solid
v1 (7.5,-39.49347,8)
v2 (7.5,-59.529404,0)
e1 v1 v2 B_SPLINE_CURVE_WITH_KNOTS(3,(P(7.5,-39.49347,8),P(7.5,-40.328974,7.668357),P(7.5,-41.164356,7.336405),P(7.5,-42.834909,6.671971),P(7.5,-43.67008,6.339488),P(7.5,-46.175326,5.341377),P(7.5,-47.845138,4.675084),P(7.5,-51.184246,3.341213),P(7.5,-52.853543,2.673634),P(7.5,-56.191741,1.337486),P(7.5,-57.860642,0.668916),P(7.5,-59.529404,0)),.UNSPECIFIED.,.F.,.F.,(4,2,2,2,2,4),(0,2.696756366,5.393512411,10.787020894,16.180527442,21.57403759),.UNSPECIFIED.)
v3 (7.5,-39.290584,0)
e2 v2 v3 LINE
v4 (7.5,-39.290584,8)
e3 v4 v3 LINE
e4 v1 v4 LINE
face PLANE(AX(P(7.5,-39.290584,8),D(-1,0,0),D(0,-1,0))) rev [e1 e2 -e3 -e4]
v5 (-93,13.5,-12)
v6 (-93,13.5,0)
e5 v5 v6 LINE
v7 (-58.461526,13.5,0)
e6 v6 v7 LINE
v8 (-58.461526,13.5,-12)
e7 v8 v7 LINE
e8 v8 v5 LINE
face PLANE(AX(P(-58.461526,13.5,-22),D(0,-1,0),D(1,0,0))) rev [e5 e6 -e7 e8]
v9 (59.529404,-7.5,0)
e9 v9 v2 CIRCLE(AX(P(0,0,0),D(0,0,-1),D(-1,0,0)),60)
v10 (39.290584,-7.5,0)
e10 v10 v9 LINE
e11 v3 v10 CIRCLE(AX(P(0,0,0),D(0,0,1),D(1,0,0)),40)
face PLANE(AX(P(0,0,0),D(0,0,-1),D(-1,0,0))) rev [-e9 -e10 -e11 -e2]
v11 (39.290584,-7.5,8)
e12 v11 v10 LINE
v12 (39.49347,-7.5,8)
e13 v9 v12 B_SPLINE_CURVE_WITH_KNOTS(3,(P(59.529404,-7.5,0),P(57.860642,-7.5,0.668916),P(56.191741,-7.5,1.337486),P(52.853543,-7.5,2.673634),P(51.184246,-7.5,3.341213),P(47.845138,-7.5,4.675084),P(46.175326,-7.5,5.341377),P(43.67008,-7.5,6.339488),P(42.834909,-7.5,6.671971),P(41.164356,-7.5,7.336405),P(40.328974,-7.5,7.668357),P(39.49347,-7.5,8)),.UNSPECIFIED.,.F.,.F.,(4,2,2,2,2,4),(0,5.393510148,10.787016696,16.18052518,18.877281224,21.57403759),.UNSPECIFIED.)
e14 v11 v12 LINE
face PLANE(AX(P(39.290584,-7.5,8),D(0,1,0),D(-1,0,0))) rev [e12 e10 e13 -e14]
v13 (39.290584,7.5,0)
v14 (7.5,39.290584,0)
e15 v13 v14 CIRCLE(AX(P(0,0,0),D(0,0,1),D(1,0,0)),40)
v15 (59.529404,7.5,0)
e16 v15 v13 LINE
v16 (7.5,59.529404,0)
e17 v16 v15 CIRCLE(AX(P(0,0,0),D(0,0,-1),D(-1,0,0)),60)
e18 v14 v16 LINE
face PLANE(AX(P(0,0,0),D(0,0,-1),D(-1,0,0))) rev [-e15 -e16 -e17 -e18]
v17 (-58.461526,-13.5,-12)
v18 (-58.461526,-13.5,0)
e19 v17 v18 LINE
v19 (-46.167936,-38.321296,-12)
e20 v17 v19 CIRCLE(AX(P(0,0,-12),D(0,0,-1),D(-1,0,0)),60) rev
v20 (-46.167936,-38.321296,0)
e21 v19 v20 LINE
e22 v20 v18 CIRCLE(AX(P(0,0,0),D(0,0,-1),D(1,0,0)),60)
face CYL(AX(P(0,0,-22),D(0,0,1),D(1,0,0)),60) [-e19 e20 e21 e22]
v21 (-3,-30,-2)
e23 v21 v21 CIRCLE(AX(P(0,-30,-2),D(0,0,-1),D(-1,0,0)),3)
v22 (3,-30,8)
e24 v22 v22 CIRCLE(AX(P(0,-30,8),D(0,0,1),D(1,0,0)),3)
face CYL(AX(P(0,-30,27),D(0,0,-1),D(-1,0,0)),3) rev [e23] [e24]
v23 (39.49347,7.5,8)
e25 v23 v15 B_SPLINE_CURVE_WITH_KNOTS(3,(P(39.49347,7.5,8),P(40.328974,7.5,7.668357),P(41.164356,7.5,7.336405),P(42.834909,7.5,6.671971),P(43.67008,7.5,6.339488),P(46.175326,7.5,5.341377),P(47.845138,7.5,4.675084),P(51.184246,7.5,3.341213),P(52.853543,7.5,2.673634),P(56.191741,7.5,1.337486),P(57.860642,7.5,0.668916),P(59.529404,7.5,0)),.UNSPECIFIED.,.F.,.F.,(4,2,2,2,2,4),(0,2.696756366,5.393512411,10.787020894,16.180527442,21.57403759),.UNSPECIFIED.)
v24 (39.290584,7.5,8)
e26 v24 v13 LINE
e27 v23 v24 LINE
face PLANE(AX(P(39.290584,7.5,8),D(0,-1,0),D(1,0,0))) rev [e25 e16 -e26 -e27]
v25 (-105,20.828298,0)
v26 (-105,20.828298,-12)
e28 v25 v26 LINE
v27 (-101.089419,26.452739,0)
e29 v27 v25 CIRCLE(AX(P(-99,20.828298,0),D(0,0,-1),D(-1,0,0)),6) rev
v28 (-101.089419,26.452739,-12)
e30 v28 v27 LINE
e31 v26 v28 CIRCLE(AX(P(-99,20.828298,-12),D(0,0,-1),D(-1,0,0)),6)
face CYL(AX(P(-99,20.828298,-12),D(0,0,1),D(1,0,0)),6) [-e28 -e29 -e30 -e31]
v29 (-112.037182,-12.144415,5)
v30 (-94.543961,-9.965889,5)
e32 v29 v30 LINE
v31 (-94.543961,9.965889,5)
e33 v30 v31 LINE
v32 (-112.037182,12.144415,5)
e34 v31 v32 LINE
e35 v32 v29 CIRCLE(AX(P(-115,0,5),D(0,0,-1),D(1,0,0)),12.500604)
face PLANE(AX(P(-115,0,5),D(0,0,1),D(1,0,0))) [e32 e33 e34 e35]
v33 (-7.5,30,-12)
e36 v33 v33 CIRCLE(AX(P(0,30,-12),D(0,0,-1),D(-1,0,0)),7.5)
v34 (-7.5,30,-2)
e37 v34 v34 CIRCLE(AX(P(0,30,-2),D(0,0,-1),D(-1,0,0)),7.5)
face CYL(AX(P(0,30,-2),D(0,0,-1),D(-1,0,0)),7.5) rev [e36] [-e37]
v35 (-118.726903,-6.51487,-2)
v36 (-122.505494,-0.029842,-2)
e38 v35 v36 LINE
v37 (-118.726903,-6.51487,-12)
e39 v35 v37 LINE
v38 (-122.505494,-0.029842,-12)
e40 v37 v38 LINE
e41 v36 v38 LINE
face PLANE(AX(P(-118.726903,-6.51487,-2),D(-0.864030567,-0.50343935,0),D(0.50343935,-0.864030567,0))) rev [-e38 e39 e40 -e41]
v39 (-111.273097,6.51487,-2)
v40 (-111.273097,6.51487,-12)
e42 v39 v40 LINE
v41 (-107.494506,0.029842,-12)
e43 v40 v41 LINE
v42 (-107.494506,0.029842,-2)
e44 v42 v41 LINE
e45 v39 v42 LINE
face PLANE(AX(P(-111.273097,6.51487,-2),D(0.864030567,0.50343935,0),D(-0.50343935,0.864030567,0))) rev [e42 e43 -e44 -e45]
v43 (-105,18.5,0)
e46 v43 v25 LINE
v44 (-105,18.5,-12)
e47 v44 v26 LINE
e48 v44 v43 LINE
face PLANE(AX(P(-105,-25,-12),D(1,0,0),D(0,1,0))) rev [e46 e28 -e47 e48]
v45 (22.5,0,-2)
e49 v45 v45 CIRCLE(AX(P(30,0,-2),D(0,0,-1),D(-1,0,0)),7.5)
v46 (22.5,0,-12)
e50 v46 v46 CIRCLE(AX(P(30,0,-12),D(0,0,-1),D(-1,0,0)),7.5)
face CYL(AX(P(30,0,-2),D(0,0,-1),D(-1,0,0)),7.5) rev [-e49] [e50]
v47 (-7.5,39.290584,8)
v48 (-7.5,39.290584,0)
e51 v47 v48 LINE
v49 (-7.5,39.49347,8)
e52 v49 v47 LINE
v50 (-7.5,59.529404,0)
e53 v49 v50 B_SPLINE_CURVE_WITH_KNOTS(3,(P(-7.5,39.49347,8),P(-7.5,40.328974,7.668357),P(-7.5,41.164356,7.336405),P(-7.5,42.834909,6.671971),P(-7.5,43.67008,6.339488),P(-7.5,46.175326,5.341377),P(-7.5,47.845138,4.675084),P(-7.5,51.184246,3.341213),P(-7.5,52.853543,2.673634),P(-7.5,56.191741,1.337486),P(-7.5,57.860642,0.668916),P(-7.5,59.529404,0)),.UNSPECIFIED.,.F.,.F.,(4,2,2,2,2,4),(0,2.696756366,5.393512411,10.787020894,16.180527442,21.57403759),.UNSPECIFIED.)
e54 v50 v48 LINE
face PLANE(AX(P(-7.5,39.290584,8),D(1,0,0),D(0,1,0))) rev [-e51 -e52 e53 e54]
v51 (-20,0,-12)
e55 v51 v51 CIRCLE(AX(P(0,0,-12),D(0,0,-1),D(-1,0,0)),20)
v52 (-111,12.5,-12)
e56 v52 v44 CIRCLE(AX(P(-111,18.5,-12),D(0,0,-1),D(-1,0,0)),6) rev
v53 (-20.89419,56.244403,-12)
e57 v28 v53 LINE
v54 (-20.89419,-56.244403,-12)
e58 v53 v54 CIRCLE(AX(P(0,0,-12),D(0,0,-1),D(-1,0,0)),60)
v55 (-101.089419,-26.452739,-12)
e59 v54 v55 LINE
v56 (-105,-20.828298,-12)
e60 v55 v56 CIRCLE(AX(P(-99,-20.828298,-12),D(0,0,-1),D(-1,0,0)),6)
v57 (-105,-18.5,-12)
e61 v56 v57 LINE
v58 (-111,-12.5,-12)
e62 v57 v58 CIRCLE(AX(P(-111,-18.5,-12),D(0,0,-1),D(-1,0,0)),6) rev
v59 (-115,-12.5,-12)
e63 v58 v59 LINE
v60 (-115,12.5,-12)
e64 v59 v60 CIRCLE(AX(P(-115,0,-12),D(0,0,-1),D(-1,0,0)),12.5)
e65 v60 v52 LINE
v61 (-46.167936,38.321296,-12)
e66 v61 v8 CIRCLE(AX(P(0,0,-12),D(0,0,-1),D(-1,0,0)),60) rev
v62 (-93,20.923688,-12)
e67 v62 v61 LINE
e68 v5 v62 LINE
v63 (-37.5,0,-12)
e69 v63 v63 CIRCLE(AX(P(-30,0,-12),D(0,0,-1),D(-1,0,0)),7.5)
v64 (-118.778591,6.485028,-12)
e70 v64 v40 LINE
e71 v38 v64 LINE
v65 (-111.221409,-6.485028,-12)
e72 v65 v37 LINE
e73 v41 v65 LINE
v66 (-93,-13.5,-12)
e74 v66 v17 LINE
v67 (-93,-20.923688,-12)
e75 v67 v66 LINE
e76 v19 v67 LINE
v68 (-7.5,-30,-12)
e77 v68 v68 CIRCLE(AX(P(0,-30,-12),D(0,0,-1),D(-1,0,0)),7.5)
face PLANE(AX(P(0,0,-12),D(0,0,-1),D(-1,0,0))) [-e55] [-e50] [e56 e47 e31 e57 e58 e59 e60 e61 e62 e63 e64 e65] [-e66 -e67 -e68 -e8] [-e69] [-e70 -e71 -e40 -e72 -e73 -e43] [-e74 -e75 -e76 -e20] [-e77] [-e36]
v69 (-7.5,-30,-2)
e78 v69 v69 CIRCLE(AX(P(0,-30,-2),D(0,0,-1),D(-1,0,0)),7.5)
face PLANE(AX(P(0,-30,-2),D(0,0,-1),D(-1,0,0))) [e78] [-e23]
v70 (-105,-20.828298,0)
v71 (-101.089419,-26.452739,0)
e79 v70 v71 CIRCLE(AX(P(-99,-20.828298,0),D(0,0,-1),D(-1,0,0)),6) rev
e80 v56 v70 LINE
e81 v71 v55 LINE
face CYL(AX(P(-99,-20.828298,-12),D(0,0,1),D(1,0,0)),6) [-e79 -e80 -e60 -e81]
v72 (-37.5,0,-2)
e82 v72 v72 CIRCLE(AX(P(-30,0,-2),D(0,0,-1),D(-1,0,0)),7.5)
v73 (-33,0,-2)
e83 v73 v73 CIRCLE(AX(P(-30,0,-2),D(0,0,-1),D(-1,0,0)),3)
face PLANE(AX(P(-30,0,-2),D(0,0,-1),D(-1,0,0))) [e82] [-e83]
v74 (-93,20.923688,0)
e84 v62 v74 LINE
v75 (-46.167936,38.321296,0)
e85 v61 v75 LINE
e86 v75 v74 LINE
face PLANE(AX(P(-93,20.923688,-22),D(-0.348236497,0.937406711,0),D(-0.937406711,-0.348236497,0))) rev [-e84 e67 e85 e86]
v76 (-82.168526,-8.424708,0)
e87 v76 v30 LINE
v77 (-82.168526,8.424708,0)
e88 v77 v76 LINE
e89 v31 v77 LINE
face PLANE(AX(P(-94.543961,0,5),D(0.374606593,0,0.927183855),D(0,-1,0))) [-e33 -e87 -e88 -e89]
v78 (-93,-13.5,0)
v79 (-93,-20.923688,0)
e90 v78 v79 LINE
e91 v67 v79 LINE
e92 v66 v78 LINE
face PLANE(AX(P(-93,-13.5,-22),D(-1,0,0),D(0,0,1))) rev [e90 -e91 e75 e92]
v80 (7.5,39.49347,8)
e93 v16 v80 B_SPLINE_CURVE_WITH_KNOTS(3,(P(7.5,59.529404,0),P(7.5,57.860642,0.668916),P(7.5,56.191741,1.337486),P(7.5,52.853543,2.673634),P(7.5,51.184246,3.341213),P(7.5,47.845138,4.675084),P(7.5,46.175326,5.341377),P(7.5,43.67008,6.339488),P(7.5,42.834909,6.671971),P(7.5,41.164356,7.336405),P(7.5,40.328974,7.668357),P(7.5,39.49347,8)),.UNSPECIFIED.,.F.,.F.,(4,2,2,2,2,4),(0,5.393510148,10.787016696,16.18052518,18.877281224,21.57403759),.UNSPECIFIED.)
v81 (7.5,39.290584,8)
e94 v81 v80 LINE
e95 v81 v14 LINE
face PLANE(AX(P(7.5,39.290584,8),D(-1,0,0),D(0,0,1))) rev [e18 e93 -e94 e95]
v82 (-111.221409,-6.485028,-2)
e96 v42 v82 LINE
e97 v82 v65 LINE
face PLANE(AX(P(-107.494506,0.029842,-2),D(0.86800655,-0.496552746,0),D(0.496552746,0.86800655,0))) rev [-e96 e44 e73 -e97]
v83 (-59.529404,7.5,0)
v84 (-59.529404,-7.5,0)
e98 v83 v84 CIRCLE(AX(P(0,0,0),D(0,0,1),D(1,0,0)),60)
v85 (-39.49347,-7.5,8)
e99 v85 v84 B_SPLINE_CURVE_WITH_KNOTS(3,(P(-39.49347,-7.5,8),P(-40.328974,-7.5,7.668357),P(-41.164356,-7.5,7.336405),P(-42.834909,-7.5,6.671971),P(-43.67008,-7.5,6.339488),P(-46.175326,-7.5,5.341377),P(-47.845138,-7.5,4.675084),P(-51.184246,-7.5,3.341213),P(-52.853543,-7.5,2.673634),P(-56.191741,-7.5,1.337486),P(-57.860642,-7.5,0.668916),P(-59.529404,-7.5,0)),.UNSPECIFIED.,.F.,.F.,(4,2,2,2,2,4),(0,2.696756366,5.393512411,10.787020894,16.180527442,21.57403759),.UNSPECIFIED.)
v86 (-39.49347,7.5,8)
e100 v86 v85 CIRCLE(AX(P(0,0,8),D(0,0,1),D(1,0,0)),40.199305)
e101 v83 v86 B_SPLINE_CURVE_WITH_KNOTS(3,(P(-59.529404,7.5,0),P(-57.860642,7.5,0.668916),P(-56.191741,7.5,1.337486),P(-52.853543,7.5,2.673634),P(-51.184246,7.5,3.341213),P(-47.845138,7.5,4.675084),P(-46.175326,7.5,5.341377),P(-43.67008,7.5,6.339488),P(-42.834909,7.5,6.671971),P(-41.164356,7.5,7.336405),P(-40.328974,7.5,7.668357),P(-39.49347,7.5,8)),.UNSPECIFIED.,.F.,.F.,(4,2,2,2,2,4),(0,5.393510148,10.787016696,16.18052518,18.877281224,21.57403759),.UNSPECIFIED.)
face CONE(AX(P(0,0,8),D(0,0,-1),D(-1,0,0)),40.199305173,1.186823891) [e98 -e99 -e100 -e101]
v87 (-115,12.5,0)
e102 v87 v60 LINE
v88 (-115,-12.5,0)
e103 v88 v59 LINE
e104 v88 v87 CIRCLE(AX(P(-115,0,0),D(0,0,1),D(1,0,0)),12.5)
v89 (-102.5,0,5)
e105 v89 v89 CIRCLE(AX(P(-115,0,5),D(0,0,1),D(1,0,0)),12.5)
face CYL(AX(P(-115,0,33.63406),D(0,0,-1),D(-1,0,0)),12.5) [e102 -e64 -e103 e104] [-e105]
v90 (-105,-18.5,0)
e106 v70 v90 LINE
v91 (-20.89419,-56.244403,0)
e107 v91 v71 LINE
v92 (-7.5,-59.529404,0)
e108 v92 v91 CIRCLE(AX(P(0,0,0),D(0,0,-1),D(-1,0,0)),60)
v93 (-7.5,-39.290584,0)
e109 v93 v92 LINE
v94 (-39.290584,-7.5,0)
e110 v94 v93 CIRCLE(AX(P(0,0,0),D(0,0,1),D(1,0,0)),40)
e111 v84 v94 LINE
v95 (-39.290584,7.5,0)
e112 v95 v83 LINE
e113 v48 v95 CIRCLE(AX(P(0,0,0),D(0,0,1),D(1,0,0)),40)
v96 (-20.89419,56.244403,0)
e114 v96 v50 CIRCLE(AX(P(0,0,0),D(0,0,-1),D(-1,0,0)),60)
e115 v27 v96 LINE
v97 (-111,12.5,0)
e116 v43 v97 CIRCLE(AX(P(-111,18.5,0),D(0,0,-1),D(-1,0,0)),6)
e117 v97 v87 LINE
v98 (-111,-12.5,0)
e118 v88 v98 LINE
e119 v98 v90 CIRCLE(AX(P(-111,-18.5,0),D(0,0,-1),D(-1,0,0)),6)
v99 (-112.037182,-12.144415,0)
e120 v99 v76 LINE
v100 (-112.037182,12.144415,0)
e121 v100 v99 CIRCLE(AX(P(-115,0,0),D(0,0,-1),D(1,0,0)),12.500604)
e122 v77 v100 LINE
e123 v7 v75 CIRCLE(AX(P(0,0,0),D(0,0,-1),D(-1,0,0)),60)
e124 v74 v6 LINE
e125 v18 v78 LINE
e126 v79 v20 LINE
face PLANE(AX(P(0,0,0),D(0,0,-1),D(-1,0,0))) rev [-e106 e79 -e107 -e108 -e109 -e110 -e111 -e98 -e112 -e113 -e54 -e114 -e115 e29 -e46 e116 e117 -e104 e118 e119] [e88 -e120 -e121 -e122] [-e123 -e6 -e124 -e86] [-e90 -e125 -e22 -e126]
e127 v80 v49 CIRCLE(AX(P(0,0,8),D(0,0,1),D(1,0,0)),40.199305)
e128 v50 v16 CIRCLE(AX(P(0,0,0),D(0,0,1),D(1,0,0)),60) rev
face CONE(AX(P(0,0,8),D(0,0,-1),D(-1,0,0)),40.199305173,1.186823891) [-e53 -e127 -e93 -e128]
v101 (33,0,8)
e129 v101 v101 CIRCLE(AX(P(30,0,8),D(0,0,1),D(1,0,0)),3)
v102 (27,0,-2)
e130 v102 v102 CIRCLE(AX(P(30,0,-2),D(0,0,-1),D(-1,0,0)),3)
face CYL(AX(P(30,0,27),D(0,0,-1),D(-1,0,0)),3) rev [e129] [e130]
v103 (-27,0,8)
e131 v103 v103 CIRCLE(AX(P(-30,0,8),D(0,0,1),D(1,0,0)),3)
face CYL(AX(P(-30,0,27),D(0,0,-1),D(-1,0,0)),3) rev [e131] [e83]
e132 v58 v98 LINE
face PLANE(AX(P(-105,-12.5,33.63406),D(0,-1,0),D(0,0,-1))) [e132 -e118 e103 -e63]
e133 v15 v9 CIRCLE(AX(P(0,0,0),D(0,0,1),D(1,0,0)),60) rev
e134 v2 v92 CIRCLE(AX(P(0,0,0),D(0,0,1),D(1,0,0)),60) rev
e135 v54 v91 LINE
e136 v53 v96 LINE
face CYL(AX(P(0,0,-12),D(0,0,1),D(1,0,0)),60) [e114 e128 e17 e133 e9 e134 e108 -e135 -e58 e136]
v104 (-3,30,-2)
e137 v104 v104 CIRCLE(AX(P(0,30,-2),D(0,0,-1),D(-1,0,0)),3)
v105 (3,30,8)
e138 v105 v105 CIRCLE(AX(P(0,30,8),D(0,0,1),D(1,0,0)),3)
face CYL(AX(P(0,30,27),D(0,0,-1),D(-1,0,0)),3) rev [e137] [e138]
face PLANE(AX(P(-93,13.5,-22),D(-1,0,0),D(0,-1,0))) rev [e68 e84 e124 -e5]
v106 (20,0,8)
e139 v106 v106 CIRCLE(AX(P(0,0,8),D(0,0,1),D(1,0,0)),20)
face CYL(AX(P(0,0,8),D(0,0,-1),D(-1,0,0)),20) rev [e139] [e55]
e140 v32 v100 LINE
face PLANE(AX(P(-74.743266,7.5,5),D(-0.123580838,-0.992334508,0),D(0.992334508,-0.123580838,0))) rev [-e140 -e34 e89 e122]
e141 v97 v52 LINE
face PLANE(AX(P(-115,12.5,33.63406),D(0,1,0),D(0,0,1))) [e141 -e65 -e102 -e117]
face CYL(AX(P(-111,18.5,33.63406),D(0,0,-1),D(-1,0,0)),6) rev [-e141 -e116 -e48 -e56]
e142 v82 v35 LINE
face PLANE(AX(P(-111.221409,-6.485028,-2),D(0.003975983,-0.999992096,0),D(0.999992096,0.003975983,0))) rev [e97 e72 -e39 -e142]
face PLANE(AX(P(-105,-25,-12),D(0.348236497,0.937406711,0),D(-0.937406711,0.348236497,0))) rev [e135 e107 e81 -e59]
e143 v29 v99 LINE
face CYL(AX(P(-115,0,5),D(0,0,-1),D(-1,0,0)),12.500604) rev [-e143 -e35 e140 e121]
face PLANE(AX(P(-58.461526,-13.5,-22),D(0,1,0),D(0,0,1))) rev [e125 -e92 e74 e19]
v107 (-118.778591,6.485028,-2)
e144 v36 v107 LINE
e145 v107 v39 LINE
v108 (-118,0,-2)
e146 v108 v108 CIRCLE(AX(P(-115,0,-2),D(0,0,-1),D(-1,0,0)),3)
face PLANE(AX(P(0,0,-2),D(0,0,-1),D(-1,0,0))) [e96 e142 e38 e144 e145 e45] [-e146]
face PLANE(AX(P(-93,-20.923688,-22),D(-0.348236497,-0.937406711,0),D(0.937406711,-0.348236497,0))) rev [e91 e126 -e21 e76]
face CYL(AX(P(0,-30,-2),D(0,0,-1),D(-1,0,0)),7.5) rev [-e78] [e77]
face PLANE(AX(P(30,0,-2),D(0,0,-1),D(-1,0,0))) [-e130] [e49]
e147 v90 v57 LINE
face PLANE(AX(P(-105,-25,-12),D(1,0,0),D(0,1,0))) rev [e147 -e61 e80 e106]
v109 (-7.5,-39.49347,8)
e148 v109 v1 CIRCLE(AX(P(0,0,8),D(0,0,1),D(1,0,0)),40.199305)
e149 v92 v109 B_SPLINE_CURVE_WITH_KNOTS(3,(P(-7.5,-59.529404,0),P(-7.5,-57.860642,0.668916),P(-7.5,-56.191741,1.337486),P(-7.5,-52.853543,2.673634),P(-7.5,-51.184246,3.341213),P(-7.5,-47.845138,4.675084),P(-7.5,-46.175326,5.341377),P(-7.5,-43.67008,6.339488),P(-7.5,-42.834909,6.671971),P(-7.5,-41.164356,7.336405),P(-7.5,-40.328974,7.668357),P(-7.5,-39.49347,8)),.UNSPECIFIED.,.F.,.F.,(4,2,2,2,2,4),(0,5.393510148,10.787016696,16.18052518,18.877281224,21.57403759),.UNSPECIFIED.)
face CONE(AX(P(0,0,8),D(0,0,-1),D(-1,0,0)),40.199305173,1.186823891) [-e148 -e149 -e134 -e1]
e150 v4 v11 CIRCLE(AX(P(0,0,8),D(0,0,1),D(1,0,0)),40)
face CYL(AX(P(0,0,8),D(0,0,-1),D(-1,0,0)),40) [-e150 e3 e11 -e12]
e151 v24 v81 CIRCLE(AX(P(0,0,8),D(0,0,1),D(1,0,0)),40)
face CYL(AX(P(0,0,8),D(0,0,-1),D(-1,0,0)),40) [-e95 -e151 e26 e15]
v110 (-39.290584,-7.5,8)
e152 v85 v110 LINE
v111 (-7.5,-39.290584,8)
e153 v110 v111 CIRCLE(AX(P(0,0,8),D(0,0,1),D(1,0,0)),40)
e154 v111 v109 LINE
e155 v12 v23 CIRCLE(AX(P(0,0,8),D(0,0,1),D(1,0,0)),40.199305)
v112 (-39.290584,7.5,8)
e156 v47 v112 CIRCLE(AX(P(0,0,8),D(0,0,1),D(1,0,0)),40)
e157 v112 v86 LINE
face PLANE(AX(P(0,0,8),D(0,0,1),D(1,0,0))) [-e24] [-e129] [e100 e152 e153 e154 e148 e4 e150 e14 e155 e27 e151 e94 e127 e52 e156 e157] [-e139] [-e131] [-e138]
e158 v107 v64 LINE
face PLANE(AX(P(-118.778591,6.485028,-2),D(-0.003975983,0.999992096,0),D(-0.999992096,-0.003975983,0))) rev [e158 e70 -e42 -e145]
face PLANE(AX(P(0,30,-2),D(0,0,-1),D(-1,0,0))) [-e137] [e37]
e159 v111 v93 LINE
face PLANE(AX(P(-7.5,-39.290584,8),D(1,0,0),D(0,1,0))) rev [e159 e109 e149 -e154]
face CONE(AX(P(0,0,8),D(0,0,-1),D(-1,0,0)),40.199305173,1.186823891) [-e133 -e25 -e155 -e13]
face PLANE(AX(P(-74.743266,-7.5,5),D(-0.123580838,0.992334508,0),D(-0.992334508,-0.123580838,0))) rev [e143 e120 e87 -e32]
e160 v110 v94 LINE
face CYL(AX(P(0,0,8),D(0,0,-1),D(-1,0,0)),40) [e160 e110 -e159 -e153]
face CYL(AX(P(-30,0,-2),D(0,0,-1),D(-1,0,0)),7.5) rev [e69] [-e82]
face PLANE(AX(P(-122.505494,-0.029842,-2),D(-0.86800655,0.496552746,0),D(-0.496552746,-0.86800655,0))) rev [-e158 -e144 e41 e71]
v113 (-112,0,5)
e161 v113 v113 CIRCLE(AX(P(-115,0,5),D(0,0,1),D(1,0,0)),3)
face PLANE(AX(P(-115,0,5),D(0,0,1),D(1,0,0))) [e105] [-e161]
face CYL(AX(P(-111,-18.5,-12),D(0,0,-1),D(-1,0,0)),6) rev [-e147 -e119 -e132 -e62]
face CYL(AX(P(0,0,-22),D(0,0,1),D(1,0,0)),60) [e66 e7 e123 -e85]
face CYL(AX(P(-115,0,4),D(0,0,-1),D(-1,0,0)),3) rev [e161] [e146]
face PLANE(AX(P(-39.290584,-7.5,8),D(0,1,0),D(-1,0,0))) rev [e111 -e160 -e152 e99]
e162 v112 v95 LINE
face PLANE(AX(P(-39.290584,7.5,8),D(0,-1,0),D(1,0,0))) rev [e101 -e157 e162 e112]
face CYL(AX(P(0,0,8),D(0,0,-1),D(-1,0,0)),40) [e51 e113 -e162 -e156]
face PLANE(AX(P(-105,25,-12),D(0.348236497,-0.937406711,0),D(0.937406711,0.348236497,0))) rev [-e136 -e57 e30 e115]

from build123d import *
from OCP.BRepFilletAPI import BRepFilletAPI_MakeChamfer
from build123d.topology import SkipClean

# Parameters (mm, degrees)
SKETCH2_R           = 40
SKETCH2_R_2         = 20
BOSS_EXTRUDE1_DEPTH = 8
BOSS_EXTRUDE2_START = 12
SKETCH3_R           = 20
BOSS_EXTRUDE2_DEPTH = 12
SKETCH4_R           = 7.5
CUT_EXTRUDE1_DEPTH  = 10
SKETCH5_R           = 3
CUT_EXTRUDE2_DEPTH  = 29
BOSS_EXTRUDE3_DEPTH = 8
CHAMFER3_SIZE       = 8
CHAMFER3_SIZE_2     = 19.800694827
BOSS_EXTRUDE4_DEPTH = 12
FILLET1_R           = 6
CUT_EXTRUDE3_DEPTH  = 10
SKETCH9_R           = 3
CUT_EXTRUDE4_DEPTH  = 6
CUT_EXTRUDE5_START  = -22
CUT_EXTRUDE5_DEPTH  = 22
SKETCH12_R          = 12.5
SKETCH12_R_2        = 3
BOSS_EXTRUDE5_DEPTH = 5
BOSS_EXTRUDE6_DEPTH = 5
CHAMFER7_SIZE       = 8
CHAMFER7_SIZE_2     = 19.800694827


# Some blends are built 0.0001 mm under size
with BuildPart() as part:
    # Sketch2 → Boss-Extrude1 (new body)
    with BuildSketch(Plane.XY):
        Circle(SKETCH2_R)
        Circle(SKETCH2_R_2, mode=Mode.SUBTRACT)
    extrude(amount=BOSS_EXTRUDE1_DEPTH)

    # Sketch3 → Boss-Extrude2 (add)
    with SkipClean():  # the faces are left unmerged after this step: merging them gives an invalid solid
        with BuildSketch(Plane(origin=(0, 0, 0), x_dir=(-1, 0, 0), z_dir=(0, 0, -1)).offset(BOSS_EXTRUDE2_START)):
            with BuildLine():
                Line((105, -25), (105, 25))
                Line((105, 25), (20.894189842, 56.244402662))
                ThreePointArc((20.894189842, 56.244402662), (-60, 0), (20.894189842, -56.244402662))
                Line((20.894189842, -56.244402662), (105, -25))
            make_face()
            Circle(SKETCH3_R, mode=Mode.SUBTRACT)
        extrude(amount=-BOSS_EXTRUDE2_DEPTH)

    # Sketch4 → Cut-Extrude1 (cut)
    with SkipClean():  # the faces are left unmerged after this step: merging them gives an invalid solid
        with BuildSketch(Plane(origin=(0, 0, -12), x_dir=(-1, 0, 0), z_dir=(0, 0, -1))):
            with Locations((0, 30)):
                Circle(SKETCH4_R)
            with Locations((30, 0)):
                Circle(SKETCH4_R)
            with Locations((0, -30)):
                Circle(SKETCH4_R)
            with Locations((-30, 0)):
                Circle(SKETCH4_R)
        extrude(amount=-CUT_EXTRUDE1_DEPTH, mode=Mode.SUBTRACT)

    # Sketch5 → Cut-Extrude2 (cut)
    with SkipClean():  # the faces are left unmerged after this step: merging them gives an invalid solid
        with BuildSketch(Plane(origin=(0, 0, -2), x_dir=(-1, 0, 0), z_dir=(0, 0, -1))):
            with Locations((30, 0)):
                Circle(SKETCH5_R)
            with Locations((0, -30)):
                Circle(SKETCH5_R)
            with Locations((-30, 0)):
                Circle(SKETCH5_R)
            with Locations((0, 30)):
                Circle(SKETCH5_R)
        extrude(amount=-CUT_EXTRUDE2_DEPTH, mode=Mode.SUBTRACT)

    # Sketch6 → Boss-Extrude3 (add)
    with SkipClean():  # the faces are left unmerged after this step: merging them gives an invalid solid
        with BuildSketch(Plane.XY):
            with BuildLine():
                Line((39.290584114, -7.5), (59.529404499, -7.5))
                ThreePointArc((59.529404499, -7.5), (60, 0), (59.529404499, 7.5))
                Line((59.529404499, 7.5), (39.290584114, 7.5))
                ThreePointArc((39.290584114, 7.5), (40, 0), (39.290584114, -7.5))
            make_face()
            with BuildLine():
                Line((-7.5, 39.290584114), (-7.5, 59.529404499))
                ThreePointArc((-7.5, 59.529404499), (0, 60), (7.5, 59.529404499))
                Line((7.5, 59.529404499), (7.5, 39.290584114))
                ThreePointArc((7.5, 39.290584114), (0, 40), (-7.5, 39.290584114))
            make_face()
            with BuildLine():
                Line((-7.5, -39.290584114), (-7.5, -59.529404499))
                ThreePointArc((-7.5, -59.529404499), (0, -60), (7.5, -59.529404499))
                Line((7.5, -59.529404499), (7.5, -39.290584114))
                ThreePointArc((7.5, -39.290584114), (0, -40), (-7.5, -39.290584114))
            make_face()
            with BuildLine():
                Line((-39.290584114, 7.5), (-59.529404499, 7.5))
                ThreePointArc((-59.529404499, 7.5), (-60, 0), (-59.529404499, -7.5))
                Line((-59.529404499, -7.5), (-39.290584114, -7.5))
                ThreePointArc((-39.290584114, -7.5), (-40, 0), (-39.290584114, 7.5))
            make_face()
        extrude(amount=BOSS_EXTRUDE3_DEPTH)

    # Chamfer3
    chamfer3_edges_1 = [part.edges().sort_by_distance(p)[0] for p in [
        (0, 60, 8),
    ]]
    chamfer3_side_1 = [part.faces().sort_by_distance(p)[0] for p in [
        (0, 60, 7.84),
    ]]
    chamfer3_edges_2 = [part.edges().sort_by_distance(p)[0] for p in [
        (60, 0, 8),
    ]]
    chamfer3_side_2 = [part.faces().sort_by_distance(p)[0] for p in [
        (59.84, 0, 8),
    ]]
    chamfer3_edges_3 = [part.edges().sort_by_distance(p)[0] for p in [
        (-60, 0, 8),
    ]]
    chamfer3_side_3 = [part.faces().sort_by_distance(p)[0] for p in [
        (-59.84, 0, 8),
    ]]
    chamfer3_edges_4 = [part.edges().sort_by_distance(p)[0] for p in [
        (0, -60, 8),
    ]]
    chamfer3_side_4 = [part.faces().sort_by_distance(p)[0] for p in [
        (0, -59.84, 8),
    ]]
    chamfer3 = BRepFilletAPI_MakeChamfer(part.part.solid().wrapped)
    for e in chamfer3_edges_1:
        chamfer3.Add(CHAMFER3_SIZE - 0.0001, CHAMFER3_SIZE_2 - 0.0001, e.wrapped, chamfer3_side_1[0].wrapped)
    for e in chamfer3_edges_2:
        chamfer3.Add(CHAMFER3_SIZE_2 - 0.0001, CHAMFER3_SIZE - 0.0001, e.wrapped, chamfer3_side_2[0].wrapped)
    for e in chamfer3_edges_3:
        chamfer3.Add(CHAMFER3_SIZE_2 - 0.0001, CHAMFER3_SIZE - 0.0001, e.wrapped, chamfer3_side_3[0].wrapped)
    for e in chamfer3_edges_4:
        chamfer3.Add(CHAMFER3_SIZE_2 - 0.0001, CHAMFER3_SIZE - 0.0001, e.wrapped, chamfer3_side_4[0].wrapped)
    add(Compound.cast(chamfer3.Shape()), mode=Mode.REPLACE)  # a hair under: the kernel refuses the full size

    # Sketch7 → Boss-Extrude4 (add)
    with SkipClean():  # the faces are left unmerged after this step: merging them gives an invalid solid
        with BuildSketch(Plane(origin=(0, 0, -12), x_dir=(-1, 0, 0), z_dir=(0, 0, -1))):
            with BuildLine():
                Line((115, 12.5), (105, 12.5))
                Line((105, 12.5), (105, -12.5))
                Line((105, -12.5), (115, -12.5))
                ThreePointArc((115, -12.5), (127.5, 0), (115, 12.5))
            make_face()
        extrude(amount=-BOSS_EXTRUDE4_DEPTH)

    # Fillet1
    fillet1_edges = [part.edges().sort_by_distance(p)[0] for p in [
        (-105, -25, -6),
        (-105, 25, -6),
        (-105, -12.5, -6),
        (-105, 12.5, -6),
    ]]
    fillet(fillet1_edges, radius=FILLET1_R)

    # Sketch8 → Cut-Extrude3 (cut)
    with SkipClean():  # the faces are left unmerged after this step: merging them gives an invalid solid
        with BuildSketch(Plane(origin=(0, 0, -12), x_dir=(-1, 0, 0), z_dir=(0, 0, -1))):
            Polygon((118.778590974, 6.485027647), (111.2730968, 6.514869597), (107.494505826, 0.02984195), (111.221409026, -6.485027647), (118.7269032, -6.514869597), (122.505494174, -0.02984195), align=None)
        extrude(amount=-CUT_EXTRUDE3_DEPTH, mode=Mode.SUBTRACT)

    # Sketch9 → Cut-Extrude4 (cut)
    with SkipClean():  # the faces are left unmerged after this step: merging them gives an invalid solid
        with BuildSketch(Plane(origin=(0, 0, -2), x_dir=(-1, 0, 0), z_dir=(0, 0, -1))):
            with Locations((115, 0)):
                Circle(SKETCH9_R)
        extrude(amount=-CUT_EXTRUDE4_DEPTH, mode=Mode.SUBTRACT)

    # Sketch10 → Cut-Extrude5 (cut)
    with SkipClean():  # the faces are left unmerged after this step: merging them gives an invalid solid
        with BuildSketch(Plane.XY.offset(CUT_EXTRUDE5_START)):
            with BuildLine():
                Line((-58.46152581, -13.5), (-93, -13.5))
                Line((-93, -13.5), (-93, -20.923688206))
                Line((-93, -20.923688206), (-46.167935821, -38.321295672))
                ThreePointArc((-46.167935821, -38.321295672), (-53.766674065, -26.62977206), (-58.46152581, -13.5))
            make_face()
            with BuildLine():
                Line((-93, 20.923688206), (-46.167935821, 38.321295672))
                ThreePointArc((-46.167935821, 38.321295672), (-53.766674065, 26.62977206), (-58.46152581, 13.5))
                Line((-58.46152581, 13.5), (-93, 13.5))
                Line((-93, 13.5), (-93, 20.923688206))
            make_face()
        extrude(amount=CUT_EXTRUDE5_DEPTH, mode=Mode.SUBTRACT)

    # Sketch12 → Boss-Extrude5 (add)
    with SkipClean():  # the faces are left unmerged after this step: merging them gives an invalid solid
        with BuildSketch(Plane.XY):
            with Locations(Location((-115, 0, 0), (0, 0, 270))):
                Circle(SKETCH12_R)
            with Locations(Location((-115, 0, 0), (0, 0, 180))):
                Circle(SKETCH12_R_2, mode=Mode.SUBTRACT)
        extrude(amount=BOSS_EXTRUDE5_DEPTH)

    # Sketch13 → Boss-Extrude6 (add)
    with SkipClean():  # the faces are left unmerged after this step: merging them gives an invalid solid
        with BuildSketch(Plane.XY):
            with BuildLine():
                Line((-74.743265697, 7.5), (-112.037181998, 12.144415139))
                ThreePointArc((-112.037181998, 12.144415139), (-102.499395631, 0), (-112.037181998, -12.144415139))
                Line((-112.037181998, -12.144415139), (-74.743265697, -7.5))
                Line((-74.743265697, -7.5), (-74.743265697, 7.5))
            make_face()
        extrude(amount=BOSS_EXTRUDE6_DEPTH)

    # Chamfer7
    # the kernel refuses this chamfer: 19.800694827, 8 mm, written as the material it takes off along each edge
    with BuildSketch(Plane(origin=(-74.743265697, -58.842983777, 5), x_dir=(0.08816706473193492, 0, -0.9961057015681392), z_dir=(0, 1, 0))) as chamfer7_piece_1_section:
        Polygon((CHAMFER7_SIZE * 0.996105701568, CHAMFER7_SIZE * 0.0881670647319), (-CHAMFER7_SIZE_2 * 0.0881670647334, CHAMFER7_SIZE_2 * 0.996105701585), (0, 0), align=None)
    chamfer7_piece_1 = extrude(amount=117.685967554, mode=Mode.PRIVATE)
    chamfer7_piece_1 = split(chamfer7_piece_1, bisect_by=Plane(origin=(-82.305145915, 0, 0), z_dir=(0, 0, 1)), keep=Keep.TOP, mode=Mode.PRIVATE)
    add(chamfer7_piece_1, mode=Mode.SUBTRACT)


solid = part.part
